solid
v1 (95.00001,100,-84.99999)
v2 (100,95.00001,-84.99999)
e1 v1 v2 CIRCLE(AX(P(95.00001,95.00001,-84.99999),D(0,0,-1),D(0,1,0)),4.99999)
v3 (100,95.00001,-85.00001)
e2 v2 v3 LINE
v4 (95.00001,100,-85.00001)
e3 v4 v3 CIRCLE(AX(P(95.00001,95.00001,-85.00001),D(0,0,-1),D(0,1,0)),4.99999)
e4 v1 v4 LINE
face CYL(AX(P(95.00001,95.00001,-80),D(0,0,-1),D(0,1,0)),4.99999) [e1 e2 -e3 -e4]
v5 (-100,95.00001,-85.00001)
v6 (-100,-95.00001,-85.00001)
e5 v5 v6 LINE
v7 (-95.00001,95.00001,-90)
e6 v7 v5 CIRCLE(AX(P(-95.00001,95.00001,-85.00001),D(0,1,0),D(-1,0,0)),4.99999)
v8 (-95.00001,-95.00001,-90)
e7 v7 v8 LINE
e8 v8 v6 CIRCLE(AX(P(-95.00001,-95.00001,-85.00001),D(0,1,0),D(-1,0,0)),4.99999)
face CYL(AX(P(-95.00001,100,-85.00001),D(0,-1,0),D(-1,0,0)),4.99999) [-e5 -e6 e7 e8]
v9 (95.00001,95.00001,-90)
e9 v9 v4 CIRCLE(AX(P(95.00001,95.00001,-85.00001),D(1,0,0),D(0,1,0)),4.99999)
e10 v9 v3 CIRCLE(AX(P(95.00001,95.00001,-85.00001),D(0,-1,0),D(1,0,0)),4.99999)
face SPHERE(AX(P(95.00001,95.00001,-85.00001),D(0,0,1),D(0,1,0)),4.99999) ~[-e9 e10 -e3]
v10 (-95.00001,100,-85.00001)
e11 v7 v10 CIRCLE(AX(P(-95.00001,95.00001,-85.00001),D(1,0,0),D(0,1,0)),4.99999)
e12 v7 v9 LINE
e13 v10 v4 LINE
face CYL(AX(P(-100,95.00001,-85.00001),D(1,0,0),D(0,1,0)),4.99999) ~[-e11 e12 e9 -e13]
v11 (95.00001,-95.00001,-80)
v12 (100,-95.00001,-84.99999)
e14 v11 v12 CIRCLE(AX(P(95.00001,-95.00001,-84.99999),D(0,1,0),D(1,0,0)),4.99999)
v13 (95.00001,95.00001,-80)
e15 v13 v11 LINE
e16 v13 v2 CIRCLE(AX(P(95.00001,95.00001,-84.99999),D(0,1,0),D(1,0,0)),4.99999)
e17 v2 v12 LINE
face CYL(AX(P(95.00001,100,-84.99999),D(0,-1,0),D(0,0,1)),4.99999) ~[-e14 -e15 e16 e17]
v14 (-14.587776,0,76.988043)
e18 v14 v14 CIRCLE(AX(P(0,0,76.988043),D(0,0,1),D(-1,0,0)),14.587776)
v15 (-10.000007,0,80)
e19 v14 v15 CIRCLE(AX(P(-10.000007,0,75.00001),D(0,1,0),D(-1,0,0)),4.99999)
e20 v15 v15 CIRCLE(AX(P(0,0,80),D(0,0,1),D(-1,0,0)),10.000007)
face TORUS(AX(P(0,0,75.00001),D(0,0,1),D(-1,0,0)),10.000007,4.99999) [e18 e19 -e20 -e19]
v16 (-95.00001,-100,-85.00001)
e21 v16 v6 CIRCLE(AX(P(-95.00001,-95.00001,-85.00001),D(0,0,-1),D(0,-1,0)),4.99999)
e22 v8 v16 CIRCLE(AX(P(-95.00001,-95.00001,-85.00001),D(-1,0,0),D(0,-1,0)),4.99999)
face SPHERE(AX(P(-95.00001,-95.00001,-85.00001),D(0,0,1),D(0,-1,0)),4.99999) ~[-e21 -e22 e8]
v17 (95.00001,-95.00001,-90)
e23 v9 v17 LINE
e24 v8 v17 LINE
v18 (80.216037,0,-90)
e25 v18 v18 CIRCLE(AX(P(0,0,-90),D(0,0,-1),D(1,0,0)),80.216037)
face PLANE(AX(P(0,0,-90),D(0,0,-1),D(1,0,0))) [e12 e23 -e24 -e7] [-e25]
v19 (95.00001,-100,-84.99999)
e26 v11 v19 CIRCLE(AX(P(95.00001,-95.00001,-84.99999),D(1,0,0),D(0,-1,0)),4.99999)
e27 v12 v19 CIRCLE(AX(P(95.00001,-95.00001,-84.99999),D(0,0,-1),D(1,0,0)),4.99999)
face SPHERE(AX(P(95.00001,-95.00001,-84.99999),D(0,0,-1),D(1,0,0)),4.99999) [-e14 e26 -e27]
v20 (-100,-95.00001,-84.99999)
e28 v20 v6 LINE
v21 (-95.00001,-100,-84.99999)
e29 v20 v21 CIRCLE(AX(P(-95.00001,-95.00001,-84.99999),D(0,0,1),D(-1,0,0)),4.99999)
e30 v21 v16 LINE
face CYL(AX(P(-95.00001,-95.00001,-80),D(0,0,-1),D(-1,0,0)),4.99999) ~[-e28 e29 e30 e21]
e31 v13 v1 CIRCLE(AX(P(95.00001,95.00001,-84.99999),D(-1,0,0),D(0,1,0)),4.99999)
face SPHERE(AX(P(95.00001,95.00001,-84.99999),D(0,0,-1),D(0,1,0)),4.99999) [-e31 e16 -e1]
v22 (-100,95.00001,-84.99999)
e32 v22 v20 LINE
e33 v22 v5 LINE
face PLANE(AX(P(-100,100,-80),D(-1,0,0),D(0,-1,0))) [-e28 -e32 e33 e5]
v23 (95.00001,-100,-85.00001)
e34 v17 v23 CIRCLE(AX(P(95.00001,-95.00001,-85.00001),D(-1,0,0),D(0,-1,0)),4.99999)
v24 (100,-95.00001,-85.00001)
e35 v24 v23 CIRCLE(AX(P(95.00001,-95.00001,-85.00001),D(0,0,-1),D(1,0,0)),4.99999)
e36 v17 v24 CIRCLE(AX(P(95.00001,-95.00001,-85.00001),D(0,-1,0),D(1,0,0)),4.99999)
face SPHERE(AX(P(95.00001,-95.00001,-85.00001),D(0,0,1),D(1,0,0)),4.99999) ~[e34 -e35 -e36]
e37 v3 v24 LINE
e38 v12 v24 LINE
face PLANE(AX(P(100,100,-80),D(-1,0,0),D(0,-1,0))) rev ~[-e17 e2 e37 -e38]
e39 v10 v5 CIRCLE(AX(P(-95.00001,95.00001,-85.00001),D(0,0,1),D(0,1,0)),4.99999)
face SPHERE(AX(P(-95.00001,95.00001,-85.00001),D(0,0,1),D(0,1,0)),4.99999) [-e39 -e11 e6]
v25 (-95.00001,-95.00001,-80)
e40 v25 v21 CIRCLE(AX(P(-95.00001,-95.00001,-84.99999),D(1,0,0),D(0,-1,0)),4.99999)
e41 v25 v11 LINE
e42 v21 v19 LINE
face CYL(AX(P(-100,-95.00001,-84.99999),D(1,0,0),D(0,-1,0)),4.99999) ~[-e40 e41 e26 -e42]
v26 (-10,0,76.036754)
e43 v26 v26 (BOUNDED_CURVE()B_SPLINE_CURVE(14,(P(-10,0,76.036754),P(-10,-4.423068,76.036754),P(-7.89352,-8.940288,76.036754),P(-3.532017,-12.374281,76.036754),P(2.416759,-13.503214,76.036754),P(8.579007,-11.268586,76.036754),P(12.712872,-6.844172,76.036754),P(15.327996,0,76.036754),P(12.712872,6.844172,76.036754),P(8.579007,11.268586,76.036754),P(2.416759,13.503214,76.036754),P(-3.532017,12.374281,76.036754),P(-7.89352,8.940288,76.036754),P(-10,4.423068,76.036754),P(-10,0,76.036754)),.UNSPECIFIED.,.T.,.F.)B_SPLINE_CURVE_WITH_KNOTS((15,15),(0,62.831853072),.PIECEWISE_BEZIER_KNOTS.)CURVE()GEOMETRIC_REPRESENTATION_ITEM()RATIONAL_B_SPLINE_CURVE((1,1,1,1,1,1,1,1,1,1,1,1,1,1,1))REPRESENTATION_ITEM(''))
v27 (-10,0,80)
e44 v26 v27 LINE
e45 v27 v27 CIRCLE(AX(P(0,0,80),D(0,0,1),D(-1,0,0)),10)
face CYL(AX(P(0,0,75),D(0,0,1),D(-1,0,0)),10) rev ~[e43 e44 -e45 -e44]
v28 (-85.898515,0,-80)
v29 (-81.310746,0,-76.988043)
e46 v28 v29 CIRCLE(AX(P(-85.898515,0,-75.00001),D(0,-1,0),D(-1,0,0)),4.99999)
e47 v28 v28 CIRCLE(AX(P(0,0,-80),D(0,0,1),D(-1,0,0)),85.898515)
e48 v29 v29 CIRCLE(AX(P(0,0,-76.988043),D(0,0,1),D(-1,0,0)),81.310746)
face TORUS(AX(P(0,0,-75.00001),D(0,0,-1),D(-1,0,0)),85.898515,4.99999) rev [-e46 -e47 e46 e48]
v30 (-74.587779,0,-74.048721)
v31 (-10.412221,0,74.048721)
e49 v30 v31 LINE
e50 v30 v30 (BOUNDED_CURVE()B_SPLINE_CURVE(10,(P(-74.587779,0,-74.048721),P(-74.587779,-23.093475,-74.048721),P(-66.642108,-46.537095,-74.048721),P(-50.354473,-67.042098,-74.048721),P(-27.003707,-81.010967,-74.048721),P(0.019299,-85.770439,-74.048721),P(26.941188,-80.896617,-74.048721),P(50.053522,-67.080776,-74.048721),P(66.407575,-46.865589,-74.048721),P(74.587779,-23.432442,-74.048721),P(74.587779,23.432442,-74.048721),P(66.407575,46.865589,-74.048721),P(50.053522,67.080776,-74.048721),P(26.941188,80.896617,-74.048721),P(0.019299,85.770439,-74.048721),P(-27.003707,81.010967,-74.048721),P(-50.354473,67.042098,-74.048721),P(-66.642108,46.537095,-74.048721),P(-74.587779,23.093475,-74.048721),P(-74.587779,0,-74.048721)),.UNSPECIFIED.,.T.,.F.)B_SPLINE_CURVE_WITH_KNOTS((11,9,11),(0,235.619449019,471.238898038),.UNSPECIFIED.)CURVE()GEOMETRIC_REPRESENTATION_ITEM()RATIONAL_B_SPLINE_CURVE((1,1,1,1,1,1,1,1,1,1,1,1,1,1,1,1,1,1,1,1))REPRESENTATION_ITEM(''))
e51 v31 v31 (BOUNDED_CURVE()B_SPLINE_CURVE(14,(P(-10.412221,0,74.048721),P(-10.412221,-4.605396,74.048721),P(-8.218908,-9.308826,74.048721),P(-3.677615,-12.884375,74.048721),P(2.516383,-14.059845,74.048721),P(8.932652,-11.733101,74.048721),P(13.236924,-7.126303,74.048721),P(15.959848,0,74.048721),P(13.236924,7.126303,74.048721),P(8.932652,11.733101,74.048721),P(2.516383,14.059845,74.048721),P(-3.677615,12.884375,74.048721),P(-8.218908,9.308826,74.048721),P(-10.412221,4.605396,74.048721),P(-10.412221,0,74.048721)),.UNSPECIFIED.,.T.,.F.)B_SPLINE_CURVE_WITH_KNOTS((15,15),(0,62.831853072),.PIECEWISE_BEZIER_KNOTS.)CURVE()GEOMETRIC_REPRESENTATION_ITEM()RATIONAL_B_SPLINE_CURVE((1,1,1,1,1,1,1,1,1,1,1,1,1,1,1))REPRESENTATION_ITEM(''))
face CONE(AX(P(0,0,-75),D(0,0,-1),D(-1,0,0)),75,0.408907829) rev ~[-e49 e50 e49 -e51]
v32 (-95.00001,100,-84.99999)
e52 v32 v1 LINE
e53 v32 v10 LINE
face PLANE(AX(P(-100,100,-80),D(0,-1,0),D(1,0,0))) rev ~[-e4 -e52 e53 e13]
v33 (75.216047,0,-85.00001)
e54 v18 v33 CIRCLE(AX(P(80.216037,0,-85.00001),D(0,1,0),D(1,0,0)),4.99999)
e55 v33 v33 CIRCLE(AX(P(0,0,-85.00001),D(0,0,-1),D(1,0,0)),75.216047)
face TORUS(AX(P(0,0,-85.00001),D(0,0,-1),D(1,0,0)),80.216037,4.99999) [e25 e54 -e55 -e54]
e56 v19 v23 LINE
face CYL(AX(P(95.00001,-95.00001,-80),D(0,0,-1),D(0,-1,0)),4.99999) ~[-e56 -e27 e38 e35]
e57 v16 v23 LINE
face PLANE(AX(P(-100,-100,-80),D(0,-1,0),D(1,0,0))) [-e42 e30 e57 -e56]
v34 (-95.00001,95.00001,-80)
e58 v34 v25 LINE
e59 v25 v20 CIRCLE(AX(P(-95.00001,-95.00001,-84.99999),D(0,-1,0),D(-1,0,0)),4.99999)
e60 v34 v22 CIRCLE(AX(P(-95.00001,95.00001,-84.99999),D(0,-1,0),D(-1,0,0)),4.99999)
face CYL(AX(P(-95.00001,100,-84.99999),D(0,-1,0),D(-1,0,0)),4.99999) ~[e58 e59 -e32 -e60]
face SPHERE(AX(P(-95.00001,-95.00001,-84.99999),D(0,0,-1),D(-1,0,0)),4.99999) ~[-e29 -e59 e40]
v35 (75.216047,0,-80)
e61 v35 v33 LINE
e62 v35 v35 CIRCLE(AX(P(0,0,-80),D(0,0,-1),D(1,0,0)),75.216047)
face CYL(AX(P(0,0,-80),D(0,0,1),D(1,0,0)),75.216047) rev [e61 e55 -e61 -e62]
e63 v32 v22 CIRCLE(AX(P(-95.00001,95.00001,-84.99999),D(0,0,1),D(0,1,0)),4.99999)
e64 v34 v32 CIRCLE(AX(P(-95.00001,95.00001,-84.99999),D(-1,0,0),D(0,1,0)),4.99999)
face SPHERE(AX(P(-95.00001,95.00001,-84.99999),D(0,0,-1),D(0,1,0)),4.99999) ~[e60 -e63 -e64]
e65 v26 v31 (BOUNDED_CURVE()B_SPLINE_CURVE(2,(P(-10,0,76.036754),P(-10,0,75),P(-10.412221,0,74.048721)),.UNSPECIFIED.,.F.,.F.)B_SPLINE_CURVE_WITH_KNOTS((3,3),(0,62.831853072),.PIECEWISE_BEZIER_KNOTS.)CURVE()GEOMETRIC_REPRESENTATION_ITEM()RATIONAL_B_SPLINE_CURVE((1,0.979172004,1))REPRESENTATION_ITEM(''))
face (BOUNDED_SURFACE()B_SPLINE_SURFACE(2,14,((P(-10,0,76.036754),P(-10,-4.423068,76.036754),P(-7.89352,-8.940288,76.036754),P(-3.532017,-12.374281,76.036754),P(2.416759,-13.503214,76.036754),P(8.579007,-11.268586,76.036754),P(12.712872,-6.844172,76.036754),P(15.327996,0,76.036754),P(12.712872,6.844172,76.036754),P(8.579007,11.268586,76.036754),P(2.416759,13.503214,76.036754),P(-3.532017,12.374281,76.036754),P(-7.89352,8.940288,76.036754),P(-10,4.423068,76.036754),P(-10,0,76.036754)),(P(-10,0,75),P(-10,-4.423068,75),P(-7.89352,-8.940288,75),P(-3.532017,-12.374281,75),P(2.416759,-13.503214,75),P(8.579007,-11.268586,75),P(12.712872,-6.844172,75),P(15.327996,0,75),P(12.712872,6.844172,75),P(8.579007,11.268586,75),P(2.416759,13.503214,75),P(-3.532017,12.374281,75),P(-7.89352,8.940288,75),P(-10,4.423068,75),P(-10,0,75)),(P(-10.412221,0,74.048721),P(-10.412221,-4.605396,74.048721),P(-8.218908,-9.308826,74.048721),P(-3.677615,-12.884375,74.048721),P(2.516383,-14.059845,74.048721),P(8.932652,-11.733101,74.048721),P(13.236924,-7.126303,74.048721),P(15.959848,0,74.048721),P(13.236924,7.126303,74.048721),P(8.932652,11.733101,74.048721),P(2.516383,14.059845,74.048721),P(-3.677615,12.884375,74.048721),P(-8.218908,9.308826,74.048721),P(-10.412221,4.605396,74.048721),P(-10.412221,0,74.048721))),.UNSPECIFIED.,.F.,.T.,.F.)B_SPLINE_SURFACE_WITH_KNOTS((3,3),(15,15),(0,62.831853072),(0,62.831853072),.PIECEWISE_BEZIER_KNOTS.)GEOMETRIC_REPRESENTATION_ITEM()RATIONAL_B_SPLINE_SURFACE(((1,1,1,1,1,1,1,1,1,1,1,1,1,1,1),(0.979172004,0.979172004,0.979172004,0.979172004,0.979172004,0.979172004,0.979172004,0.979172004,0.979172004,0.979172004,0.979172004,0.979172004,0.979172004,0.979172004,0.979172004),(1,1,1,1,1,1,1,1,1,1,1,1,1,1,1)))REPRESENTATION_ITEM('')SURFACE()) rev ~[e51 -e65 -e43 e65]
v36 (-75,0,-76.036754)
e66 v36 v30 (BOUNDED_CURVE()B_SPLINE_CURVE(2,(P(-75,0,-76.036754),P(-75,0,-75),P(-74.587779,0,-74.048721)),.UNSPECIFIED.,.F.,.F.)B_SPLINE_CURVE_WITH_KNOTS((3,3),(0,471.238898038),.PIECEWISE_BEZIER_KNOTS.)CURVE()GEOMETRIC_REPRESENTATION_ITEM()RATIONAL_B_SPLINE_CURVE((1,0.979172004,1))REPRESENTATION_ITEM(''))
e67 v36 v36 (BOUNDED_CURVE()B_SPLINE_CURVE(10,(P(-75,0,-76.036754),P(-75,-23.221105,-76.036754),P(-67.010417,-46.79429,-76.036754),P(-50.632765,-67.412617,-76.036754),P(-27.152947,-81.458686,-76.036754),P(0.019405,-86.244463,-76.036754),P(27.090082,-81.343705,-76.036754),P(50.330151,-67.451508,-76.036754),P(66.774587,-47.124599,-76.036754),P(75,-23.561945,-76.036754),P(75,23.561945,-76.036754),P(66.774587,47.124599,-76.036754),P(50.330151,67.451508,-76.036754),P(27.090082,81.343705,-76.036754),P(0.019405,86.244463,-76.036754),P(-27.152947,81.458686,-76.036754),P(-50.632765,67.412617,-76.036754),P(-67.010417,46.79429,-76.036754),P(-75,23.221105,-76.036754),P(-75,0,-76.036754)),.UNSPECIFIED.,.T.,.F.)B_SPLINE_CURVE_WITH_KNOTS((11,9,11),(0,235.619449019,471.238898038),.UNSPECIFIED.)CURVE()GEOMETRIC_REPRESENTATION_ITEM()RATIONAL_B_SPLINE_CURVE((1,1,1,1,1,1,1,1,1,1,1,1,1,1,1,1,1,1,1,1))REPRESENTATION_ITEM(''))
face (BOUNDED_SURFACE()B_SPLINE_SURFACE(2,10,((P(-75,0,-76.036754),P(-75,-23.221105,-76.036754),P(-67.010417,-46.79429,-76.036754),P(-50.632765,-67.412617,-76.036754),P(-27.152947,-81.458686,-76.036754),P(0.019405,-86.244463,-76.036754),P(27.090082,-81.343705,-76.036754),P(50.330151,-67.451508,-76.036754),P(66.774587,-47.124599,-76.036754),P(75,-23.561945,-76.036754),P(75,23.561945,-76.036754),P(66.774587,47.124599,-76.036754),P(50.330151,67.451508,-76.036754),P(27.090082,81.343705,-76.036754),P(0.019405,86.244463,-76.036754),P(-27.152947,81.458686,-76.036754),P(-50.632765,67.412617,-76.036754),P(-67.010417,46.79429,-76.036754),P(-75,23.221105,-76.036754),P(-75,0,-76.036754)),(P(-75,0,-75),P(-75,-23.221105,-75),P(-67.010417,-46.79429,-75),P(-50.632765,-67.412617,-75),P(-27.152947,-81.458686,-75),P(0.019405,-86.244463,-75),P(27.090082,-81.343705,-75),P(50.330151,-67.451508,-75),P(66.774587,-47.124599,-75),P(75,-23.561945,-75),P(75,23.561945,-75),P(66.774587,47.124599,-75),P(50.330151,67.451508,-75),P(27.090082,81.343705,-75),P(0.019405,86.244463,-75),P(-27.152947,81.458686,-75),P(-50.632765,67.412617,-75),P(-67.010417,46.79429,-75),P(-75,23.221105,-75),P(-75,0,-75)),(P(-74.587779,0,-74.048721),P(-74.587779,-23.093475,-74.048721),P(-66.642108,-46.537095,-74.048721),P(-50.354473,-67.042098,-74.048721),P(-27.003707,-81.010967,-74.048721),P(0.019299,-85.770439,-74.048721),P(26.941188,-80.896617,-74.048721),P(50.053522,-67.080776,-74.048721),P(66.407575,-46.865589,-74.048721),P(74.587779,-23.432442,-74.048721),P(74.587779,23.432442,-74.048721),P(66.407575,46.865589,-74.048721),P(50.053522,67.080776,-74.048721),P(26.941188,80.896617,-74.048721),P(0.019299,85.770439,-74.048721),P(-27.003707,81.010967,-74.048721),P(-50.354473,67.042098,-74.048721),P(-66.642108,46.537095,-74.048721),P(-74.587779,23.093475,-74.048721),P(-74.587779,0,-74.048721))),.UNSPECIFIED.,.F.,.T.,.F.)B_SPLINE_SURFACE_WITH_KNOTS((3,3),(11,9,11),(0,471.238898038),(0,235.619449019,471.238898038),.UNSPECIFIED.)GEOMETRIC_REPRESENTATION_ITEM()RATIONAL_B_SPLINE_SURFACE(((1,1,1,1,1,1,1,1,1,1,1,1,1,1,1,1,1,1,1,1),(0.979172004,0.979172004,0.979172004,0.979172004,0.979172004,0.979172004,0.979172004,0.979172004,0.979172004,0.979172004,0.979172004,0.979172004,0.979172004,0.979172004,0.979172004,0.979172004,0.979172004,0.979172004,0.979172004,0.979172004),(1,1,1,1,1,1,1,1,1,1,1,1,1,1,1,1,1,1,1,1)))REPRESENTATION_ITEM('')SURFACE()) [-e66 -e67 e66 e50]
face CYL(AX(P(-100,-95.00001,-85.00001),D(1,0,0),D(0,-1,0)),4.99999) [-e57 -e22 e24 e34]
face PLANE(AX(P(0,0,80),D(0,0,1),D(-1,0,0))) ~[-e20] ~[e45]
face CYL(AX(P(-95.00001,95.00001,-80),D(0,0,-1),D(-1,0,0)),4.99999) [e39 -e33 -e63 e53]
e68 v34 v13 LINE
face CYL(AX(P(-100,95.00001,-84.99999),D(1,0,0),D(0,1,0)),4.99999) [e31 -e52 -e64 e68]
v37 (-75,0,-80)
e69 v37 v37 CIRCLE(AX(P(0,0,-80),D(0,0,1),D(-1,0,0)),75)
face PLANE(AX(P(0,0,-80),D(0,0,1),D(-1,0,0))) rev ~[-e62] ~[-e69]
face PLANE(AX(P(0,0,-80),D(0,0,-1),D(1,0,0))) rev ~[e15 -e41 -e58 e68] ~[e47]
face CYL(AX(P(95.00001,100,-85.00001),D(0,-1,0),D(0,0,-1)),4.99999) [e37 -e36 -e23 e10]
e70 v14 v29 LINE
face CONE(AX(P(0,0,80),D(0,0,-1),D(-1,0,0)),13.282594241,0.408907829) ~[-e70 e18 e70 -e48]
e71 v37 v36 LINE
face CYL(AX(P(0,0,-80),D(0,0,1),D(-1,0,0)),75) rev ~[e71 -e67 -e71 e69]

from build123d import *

# Parameters (mm, degrees)
F2_W     = 200
F2_H     = 200
F2_R     = 82.6159275748
F2_R_2   = 75.2160474693
F3_DEPTH = 10
F4_R     = 4.99999


# Not quite as in the source:
# - a fillet or chamfer is up to 0.001 mm smaller than in the source, because OpenCascade refuses the exact size


with BuildPart() as f1:
    # F0 (on Front) → F1 (revolve)
    with BuildSketch(Plane.XZ):
        Polygon((-75, -75), (-10, 75), (-10, 80), (-13.2825942414, 80), (-82.6159275748, -80), (-75, -80), align=None)
    revolve(axis=Axis((0, 0, 2.9210224748), (0, 0, 1)))

    # F2 (on face) → F3 (join)
    with BuildSketch(Plane(origin=(0, 0, -80), x_dir=(1, 0, 0), z_dir=(0, 0, -1))):
        Rectangle(F2_W, F2_H)
        Circle(F2_R, mode=Mode.SUBTRACT)
        Circle(F2_R)
        Circle(F2_R_2, mode=Mode.SUBTRACT)
    extrude(amount=F3_DEPTH)

    # F4 (radius 5 in the source; OpenCascade refuses exactly that, so slightly less here)
    f4_edges = [f1.edges().sort_by_distance(p)[0] for p in [
        (-100, 100, -85),
        (100, 100, -85),
        (100, -100, -85),
        (-75.216047, 0, -90),
        (75, 0, -75),
        (-100, -100, -85),
        (0, 100, -90),
        (100, 0, -90),
        (0, -100, -90),
        (-100, 0, -90),
        (0, 100, -80),
        (-100, 0, -80),
        (100, 0, -80),
        (0, -100, -80),
        (82.615928, 0, -80),
        (13.282594, 0, 80),
        (10, 0, 75),
    ]]
    fillet(f4_edges, radius=F4_R)


solid = f1.part
